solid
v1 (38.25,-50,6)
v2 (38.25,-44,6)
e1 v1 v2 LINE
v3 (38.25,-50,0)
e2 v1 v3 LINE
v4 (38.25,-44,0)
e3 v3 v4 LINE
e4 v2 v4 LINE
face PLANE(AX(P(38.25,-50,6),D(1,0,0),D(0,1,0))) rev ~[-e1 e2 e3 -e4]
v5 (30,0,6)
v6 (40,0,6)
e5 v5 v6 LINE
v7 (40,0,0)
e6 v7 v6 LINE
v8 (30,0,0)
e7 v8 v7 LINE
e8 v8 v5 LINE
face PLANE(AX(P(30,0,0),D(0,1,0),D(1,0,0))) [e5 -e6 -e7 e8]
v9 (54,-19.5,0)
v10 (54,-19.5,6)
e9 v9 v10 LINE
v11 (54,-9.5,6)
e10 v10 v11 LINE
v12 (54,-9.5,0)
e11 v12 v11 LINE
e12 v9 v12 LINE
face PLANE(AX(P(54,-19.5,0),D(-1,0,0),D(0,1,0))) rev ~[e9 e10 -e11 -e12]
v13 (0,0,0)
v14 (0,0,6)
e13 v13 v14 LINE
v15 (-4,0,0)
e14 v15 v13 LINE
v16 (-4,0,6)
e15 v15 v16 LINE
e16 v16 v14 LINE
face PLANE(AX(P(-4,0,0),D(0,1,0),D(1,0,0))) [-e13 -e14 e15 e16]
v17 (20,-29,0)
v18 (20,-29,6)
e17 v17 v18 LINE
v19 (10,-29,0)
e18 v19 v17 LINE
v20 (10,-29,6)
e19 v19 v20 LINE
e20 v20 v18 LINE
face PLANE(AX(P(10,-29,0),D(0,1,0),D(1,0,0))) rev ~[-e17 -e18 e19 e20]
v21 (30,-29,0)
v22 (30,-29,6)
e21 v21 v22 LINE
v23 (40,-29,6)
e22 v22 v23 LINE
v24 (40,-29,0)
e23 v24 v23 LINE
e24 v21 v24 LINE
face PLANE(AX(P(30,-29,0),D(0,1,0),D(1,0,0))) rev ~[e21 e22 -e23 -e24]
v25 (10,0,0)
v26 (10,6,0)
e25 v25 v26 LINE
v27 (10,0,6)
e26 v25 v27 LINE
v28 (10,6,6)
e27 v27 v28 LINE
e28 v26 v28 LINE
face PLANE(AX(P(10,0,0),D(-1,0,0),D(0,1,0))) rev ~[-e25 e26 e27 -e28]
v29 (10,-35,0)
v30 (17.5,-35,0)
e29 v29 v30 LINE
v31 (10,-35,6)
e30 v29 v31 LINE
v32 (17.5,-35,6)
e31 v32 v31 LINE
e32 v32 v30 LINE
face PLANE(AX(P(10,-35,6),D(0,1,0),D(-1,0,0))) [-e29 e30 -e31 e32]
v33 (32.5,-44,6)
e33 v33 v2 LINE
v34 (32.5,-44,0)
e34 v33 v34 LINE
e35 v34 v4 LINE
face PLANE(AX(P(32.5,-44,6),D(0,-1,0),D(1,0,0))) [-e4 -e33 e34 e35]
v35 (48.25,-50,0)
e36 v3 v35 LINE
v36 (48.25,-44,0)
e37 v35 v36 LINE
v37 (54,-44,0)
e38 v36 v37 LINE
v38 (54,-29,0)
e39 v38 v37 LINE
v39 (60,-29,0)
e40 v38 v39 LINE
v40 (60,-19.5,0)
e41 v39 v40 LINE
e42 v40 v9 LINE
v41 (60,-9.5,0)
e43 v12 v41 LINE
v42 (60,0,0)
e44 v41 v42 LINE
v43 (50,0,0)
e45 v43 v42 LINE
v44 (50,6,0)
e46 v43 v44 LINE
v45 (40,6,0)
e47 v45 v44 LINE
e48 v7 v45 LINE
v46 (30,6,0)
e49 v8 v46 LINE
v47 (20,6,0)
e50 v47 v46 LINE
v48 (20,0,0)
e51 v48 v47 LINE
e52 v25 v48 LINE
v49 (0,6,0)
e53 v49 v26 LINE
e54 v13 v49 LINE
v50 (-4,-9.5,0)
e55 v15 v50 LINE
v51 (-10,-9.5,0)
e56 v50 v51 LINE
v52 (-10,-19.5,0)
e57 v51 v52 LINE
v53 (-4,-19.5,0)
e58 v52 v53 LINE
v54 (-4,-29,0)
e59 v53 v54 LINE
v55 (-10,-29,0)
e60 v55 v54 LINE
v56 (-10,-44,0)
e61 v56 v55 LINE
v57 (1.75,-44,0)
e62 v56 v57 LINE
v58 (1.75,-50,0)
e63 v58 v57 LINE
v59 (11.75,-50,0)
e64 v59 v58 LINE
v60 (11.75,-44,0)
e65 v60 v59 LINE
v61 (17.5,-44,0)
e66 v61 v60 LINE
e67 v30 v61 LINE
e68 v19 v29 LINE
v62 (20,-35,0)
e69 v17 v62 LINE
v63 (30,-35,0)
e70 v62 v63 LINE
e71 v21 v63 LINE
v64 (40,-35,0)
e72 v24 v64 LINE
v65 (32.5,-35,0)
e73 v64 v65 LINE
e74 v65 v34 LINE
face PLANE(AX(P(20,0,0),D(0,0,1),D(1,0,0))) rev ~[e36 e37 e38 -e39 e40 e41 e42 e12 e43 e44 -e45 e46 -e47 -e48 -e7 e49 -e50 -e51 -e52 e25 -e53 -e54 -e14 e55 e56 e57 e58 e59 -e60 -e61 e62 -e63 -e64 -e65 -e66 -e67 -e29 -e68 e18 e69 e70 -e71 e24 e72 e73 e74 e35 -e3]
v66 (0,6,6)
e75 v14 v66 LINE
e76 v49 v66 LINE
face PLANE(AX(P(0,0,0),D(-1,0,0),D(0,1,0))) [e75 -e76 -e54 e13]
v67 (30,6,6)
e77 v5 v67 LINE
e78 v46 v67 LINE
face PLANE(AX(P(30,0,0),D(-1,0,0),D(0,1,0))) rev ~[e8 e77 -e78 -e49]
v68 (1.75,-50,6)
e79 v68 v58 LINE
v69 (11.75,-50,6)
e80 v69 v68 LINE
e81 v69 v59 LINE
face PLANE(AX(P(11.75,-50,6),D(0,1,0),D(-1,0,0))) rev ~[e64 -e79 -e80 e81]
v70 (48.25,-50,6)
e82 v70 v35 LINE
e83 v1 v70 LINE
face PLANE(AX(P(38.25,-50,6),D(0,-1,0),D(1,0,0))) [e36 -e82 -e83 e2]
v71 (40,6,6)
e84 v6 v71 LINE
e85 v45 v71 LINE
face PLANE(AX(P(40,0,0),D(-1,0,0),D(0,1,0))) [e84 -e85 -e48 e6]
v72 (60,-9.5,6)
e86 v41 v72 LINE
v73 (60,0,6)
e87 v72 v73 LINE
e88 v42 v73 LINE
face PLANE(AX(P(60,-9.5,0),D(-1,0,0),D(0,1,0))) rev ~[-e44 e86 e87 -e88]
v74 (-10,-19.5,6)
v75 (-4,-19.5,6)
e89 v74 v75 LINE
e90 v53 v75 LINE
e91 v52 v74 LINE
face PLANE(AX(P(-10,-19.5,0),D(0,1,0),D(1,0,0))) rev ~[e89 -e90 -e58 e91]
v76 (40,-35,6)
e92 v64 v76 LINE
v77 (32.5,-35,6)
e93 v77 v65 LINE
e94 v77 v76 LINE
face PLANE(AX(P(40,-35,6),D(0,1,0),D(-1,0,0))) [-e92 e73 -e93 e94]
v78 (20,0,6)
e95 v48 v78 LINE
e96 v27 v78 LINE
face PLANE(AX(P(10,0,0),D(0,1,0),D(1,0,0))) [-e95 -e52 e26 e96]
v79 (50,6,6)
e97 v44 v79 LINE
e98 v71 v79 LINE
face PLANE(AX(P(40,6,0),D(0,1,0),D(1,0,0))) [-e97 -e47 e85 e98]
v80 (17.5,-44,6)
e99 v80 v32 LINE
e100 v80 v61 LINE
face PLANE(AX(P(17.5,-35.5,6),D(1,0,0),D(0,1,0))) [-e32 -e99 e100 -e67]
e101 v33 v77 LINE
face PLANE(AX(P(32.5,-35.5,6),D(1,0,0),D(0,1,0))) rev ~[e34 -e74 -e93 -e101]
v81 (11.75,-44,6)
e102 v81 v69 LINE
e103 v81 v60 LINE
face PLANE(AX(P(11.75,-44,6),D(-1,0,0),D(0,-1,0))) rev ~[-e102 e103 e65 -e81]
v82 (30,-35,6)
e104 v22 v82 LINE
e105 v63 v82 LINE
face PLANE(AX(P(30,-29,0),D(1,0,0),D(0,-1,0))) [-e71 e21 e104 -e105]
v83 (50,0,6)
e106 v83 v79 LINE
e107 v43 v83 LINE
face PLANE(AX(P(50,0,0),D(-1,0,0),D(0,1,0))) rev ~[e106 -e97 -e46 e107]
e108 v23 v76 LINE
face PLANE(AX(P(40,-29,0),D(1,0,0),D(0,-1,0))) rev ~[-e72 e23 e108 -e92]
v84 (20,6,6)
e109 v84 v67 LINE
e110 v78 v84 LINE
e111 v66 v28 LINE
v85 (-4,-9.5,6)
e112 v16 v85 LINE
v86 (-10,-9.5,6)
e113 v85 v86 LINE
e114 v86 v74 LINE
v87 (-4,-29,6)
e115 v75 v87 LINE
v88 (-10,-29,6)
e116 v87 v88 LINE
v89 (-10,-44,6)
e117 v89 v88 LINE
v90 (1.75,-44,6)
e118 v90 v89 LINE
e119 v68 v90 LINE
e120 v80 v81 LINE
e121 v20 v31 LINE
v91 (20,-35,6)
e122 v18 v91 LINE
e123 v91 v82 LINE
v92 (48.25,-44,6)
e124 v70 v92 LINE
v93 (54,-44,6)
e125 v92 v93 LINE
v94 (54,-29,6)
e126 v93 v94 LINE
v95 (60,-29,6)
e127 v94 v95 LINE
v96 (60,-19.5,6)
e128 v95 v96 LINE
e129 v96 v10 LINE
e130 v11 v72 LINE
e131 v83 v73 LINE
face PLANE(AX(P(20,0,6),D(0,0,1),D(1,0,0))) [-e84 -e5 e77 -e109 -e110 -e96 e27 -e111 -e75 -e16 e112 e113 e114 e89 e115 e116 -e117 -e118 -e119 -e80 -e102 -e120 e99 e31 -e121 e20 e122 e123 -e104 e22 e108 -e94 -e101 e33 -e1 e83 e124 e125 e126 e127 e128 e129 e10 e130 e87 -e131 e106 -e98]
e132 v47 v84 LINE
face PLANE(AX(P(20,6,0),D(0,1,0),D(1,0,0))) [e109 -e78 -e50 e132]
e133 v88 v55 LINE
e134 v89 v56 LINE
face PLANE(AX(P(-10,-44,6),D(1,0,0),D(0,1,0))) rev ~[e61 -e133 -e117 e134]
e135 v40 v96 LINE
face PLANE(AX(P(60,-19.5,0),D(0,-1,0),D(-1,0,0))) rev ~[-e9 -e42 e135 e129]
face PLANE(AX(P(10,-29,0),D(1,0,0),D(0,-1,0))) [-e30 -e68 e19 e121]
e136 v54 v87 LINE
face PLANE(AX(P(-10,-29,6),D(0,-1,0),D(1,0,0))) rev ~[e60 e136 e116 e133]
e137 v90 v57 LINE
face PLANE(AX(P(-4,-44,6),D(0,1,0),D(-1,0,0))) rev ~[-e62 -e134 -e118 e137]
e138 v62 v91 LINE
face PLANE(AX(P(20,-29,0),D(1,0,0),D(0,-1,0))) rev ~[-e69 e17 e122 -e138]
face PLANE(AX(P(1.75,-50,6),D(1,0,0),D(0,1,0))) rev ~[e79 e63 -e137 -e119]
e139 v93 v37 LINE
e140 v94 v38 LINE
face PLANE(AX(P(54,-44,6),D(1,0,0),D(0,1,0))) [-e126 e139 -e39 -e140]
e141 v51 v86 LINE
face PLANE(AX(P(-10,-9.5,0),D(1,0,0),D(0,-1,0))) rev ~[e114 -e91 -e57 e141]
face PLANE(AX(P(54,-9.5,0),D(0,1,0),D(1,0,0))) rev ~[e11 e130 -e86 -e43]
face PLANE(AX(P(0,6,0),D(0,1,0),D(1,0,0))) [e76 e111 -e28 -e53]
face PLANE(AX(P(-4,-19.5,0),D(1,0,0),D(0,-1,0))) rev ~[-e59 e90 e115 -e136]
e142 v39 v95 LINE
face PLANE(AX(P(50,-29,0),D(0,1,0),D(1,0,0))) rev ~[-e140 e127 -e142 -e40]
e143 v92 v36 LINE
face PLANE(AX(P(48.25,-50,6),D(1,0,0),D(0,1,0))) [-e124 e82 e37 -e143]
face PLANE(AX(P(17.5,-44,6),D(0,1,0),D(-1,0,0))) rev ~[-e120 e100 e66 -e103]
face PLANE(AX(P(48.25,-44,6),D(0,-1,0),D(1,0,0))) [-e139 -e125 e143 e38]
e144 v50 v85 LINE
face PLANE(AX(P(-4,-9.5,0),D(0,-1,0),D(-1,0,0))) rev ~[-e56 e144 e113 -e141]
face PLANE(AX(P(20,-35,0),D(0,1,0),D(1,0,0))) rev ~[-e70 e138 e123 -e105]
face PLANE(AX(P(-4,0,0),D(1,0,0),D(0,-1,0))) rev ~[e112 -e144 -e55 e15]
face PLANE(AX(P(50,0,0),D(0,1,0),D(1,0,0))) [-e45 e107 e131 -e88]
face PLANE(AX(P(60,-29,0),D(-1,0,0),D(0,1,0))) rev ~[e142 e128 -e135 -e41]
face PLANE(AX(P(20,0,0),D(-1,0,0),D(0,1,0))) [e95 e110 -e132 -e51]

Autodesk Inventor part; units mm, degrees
ref_plane "YZ Plane" through (0, 0, 0) normal (1, 0, 0) x (0, 1, 0)
ref_plane "XZ Plane" through (0, 0, 0) normal (0, 1, 0) x (-1, 0, 0)
ref_plane "XY Plane" through (0, 0, 0) normal (0, 0, 1) x (1, 0, 0)
ref_plane "Work Plane1" through (20, 0, 0) normal (0, 0, 1) x (1, 0, 0)
sketch "Sketch1" plane through (20, 0, 0) normal (0, 0, 1) x (1, 0, 0)
  line L0 (-20, 0) -> (-10, 0)
  line L1 (-10, 0) -> (-10, 6)
  line L2 (-20, 6) -> (-10, 6)
  line L3 (-20, 0) -> (-20, 6)
  line L4 (0, 0) -> (10, 0)
  line L5 (10, 0) -> (10, 6)
  line L6 (0, 6) -> (10, 6)
  line L7 (0, 0) -> (0, 6)
  line L8 (20, 0) -> (30, 0)
  line L9 (30, 0) -> (30, 6)
  line L10 (20, 6) -> (30, 6)
  line L11 (20, 0) -> (20, 6)
  line L12 (-30, 0) -> (-24, 0)
  line L13 (-24, 0) -> (-24, 6)
  line L14 (-30, 6) -> (-24, 6)
  line L15 (-30, 0) -> (-30, 6)
  line L16 (-30, 0) -> (-20, 0)
  line L17 (-10, 0) -> (0, 0)
  line L18 (10, 0) -> (20, 0)
  line L19 (30, 0) -> (40, 0)
  line L20 (40, 0) -> (-24, 0)
  line L21 (-24, 0) -> (-24, -29)
  line L22 (-24, -29) -> (40, -29)
  line L23 (40, -29) -> (40, 0)
  line L24 (-24, -9.5) -> (-30, -9.5)
  line L25 (-30, -9.5) -> (-30, -19.5)
  line L26 (-30, -19.5) -> (-24, -19.5)
  line L27 (-24, -19.5) -> (-24, -9.5)
  line L28 (40, -19.5) -> (34, -19.5)
  line L29 (34, -19.5) -> (34, -9.5)
  line L30 (34, -9.5) -> (40, -9.5)
  line L31 (40, -9.5) -> (40, -19.5)
  line L32 (-24, -14.5) -> (40, -14.5) construction
  line L33 (-20, -29) -> (-10, -29)
  line L34 (-10, -29) -> (-10, -35)
  line L35 (-20, -35) -> (-10, -35)
  line L36 (-20, -29) -> (-20, -35)
  line L37 (0, -29) -> (10, -29)
  line L38 (10, -29) -> (10, -35)
  line L39 (0, -35) -> (10, -35)
  line L40 (0, -29) -> (0, -35)
  line L41 (20, -29) -> (30, -29)
  line L42 (30, -29) -> (30, -35)
  line L43 (20, -35) -> (30, -35)
  line L44 (20, -29) -> (20, -35)
  line L45 (-10, -29) -> (0, -29)
  line L46 (10, -29) -> (20, -29)
  point P0 (-30, -14.5)
  point P1 (34, -14.5)
  dimension "d0" = 29
  dimension "d1" = 6
  dimension "d2" = 10
sketch "Sketch2" plane through (20, 0, 6) normal (0, 0, 1) x (1, 0, 0)
  line L0 (-24, -44) -> (-24, -29)
  line L1 (-18.25, -44) -> (-30, -44)
  line L2 (-2.5, -44) -> (-8.25, -44)
  line L3 (-2.5, -35.5) -> (-2.5, -44)
  line L4 (12, -35) -> (-2, -35)
  line L5 (10, -35) -> (0, -35) construction
  line L6 (5, -35) -> (5, 6) construction
  line L7 (0, 6) -> (10, 6) construction
  line L8 (40, -19.5) -> (34, -19.5)
  line L9 (34, -19.5) -> (34, -9.5)
  line L10 (34, -9.5) -> (40, -9.5)
  line L11 (40, 0) -> (40, -9.5)
  line L12 (30, 0) -> (40, 0)
  line L13 (30, 6) -> (30, 0)
  line L14 (20, 6) -> (30, 6)
  line L15 (20, 0) -> (20, 6)
  line L16 (10, 0) -> (20, 0)
  line L17 (10, 6) -> (10, 0)
  line L18 (0, 6) -> (10, 6)
  line L19 (0, 0) -> (0, 6)
  line L20 (-10, 0) -> (0, 0)
  line L21 (-10, 6) -> (-10, 0)
  line L22 (-20, 6) -> (-10, 6)
  line L23 (-20, 0) -> (-20, 6)
  line L24 (-24, 0) -> (-20, 0)
  line L25 (-24, -9.5) -> (-24, 0)
  line L26 (-30, -9.5) -> (-24, -9.5)
  line L27 (-30, -19.5) -> (-30, -9.5)
  line L28 (-24, -19.5) -> (-30, -19.5)
  line L29 (-24, -29) -> (-24, -19.5)
  line L30 (-20, -29) -> (-24, -29)
  line L31 (-20, -35) -> (-20, -29)
  line L32 (-10, -35) -> (-20, -35)
  line L33 (-10, -29) -> (-10, -35)
  line L34 (0, -29) -> (-10, -29)
  line L35 (0, -35) -> (0, -29)
  line L36 (10, -35) -> (0, -35)
  line L37 (10, -29) -> (10, -35)
  line L38 (20, -29) -> (10, -29)
  line L39 (20, -35) -> (20, -29)
  line L40 (30, -35) -> (20, -35)
  line L41 (30, -29) -> (30, -35)
  line L42 (40, -29) -> (30, -29)
  line L43 (40, -19.5) -> (40, -29)
  line L44 (-2.5, -44) -> (-2.5, -35)
  line L45 (-2.5, -35) -> (0, -35)
  line L46 (-8.25, -50) -> (-18.25, -50)
  line L47 (-18.25, -50) -> (-18.25, -44)
  line L48 (34, -44) -> (34, -29)
  line L49 (12.5, -44) -> (18.25, -44)
  line L50 (12.5, -35.5) -> (12.5, -44)
  line L51 (30, -29) -> (34, -29)
  line L52 (30, -35) -> (30, -29)
  line L53 (20, -35) -> (30, -35)
  line L54 (20, -29) -> (20, -35)
  line L55 (10, -29) -> (20, -29)
  line L56 (10, -35) -> (10, -29)
  line L57 (12.5, -44) -> (12.5, -35)
  line L58 (12.5, -35) -> (10, -35)
  line L59 (18.25, -50) -> (28.25, -50)
  line L60 (28.25, -50) -> (28.25, -44)
  line L61 (28.25, -44) -> (34, -44)
  line L62 (-24, -29) -> (-20, -29)
  line L63 (-20, -35) -> (-20, -29)
  line L64 (-20, -35) -> (-20, -29)
  line L65 (-20, -35) -> (-10, -35)
  line L66 (-10, -35) -> (-10, -29)
  line L67 (0, -29) -> (-10, -29)
  line L68 (0, -29) -> (0, -35)
  line L69 (-8.25, -44) -> (-8.25, -50)
  line L70 (18.25, -50) -> (18.25, -44)
  line L71 (34, -44) -> (34, -29)
  line L72 (28.25, -44) -> (40, -44)
  line L73 (12.5, -44) -> (18.25, -44)
  line L74 (12.5, -35.5) -> (12.5, -44)
  line L75 (30, -29) -> (34, -29)
  line L76 (30, -35) -> (30, -29)
  line L77 (20, -35) -> (30, -35)
  line L78 (20, -29) -> (20, -35)
  line L79 (10, -29) -> (20, -29)
  line L80 (10, -35) -> (10, -29)
  line L81 (12.5, -44) -> (12.5, -35)
  line L82 (12.5, -35) -> (10, -35)
  line L83 (18.25, -50) -> (28.25, -50)
  line L84 (28.25, -50) -> (28.25, -44)
  line L85 (34, -29) -> (30, -29)
  line L86 (30, -35) -> (30, -29)
  line L87 (30, -35) -> (30, -29)
  line L88 (30, -35) -> (20, -35)
  line L89 (20, -35) -> (20, -29)
  line L90 (10, -29) -> (20, -29)
  line L91 (10, -29) -> (10, -35)
  line L92 (18.25, -44) -> (18.25, -50)
  line L93 (-24, -44) -> (-30, -44)
  line L94 (-30, -44) -> (-30, -29)
  line L95 (-30, -29) -> (-24, -29)
  line L96 (-24, -29) -> (-24, -44)
  line L97 (-10, -29) -> (0, -29)
  line L98 (0, -29) -> (0, -35)
  line L99 (0, -35) -> (-10, -35)
  line L100 (-10, -35) -> (-10, -29)
  line L101 (20, -29) -> (10, -29)
  line L102 (10, -29) -> (20, -29)
  line L103 (20, -29) -> (20, -35)
  line L104 (20, -35) -> (10, -35)
  line L105 (10, -35) -> (10, -29)
  line L106 (30, -29) -> (34, -29)
  line L107 (34, -29) -> (34, -35)
  line L108 (34, -35) -> (30, -35)
  line L109 (30, -35) -> (30, -29)
  line L110 (-20, -29) -> (-24, -29)
  line L111 (-24, -29) -> (-24, -35)
  line L112 (-24, -35) -> (-20, -35)
  line L113 (-20, -35) -> (-20, -29)
  line L114 (30, -35) -> (20, -35)
  point P0 (-2.5, -49.5)
  point P1 (12.5, -49.5)
  point P2 (12.5, -49.5)
  dimension "d4" = 10
  dimension "d6" = 6
  dimension "d12" = 6
  dimension "d13" = 15
extrude "Plate1" add sketch "Sketch1" along normal blind 6 contours L3 L2 L1 L0 | L0 L17 L4 L18 L8 L19 L23 L30 L29 L28 L22 L21 L16 | L7 L6 L5 L4 | L21 L26 L25 L24 | L11 L10 L9 L8 | L22 L34 L35 L36 | L22 L38 L39 L40 | L22 L42 L43 L44
sheet face with bend "Face2" sketch "Sketch2" thickness 6 toward (0, 0, -1) bend radius 6 contours L1 L94 L95 L0 | L0 L112 L32 L99 L44 L3 L2 L69 L46 L47 L1 | L0 L30 L31 L112 | L104 L40 L108 L48 L61 L60 L59 L70 L49 L50 L57 | L41 L42 L48 L108
bend "Bend1"
equation "\"d12\" = d6"
equation "\"d3\" = Thickness"
equation "\"d7\" = BendRadius"
equation "\"d8\" = BendReliefWidth"
equation "\"d10\" = MinimumRemnant"
equation "\"d9\" = BendReliefDepth"
equation "\"d11\" = TransitionRadius"
equation "\"BendRadius\" = Thickness"
equation "\"BendReliefWidth\" = Thickness"
equation "\"BendReliefDepth\" = 0.5 * Thickness"
equation "\"CornerReliefSize\" = 4 * Thickness"
equation "\"MinimumRemnant\" = 2 * Thickness"
equation "\"TransitionRadius\" = BendRadius"
equation "\"JacobiRadiusSize\" = BendRadius"
equation "\"GapSize\" = Thickness"
equation "\"Thickness\" = 6"
properties part number "jotstick behuizing zijkant" material "Wood (Birch)"
